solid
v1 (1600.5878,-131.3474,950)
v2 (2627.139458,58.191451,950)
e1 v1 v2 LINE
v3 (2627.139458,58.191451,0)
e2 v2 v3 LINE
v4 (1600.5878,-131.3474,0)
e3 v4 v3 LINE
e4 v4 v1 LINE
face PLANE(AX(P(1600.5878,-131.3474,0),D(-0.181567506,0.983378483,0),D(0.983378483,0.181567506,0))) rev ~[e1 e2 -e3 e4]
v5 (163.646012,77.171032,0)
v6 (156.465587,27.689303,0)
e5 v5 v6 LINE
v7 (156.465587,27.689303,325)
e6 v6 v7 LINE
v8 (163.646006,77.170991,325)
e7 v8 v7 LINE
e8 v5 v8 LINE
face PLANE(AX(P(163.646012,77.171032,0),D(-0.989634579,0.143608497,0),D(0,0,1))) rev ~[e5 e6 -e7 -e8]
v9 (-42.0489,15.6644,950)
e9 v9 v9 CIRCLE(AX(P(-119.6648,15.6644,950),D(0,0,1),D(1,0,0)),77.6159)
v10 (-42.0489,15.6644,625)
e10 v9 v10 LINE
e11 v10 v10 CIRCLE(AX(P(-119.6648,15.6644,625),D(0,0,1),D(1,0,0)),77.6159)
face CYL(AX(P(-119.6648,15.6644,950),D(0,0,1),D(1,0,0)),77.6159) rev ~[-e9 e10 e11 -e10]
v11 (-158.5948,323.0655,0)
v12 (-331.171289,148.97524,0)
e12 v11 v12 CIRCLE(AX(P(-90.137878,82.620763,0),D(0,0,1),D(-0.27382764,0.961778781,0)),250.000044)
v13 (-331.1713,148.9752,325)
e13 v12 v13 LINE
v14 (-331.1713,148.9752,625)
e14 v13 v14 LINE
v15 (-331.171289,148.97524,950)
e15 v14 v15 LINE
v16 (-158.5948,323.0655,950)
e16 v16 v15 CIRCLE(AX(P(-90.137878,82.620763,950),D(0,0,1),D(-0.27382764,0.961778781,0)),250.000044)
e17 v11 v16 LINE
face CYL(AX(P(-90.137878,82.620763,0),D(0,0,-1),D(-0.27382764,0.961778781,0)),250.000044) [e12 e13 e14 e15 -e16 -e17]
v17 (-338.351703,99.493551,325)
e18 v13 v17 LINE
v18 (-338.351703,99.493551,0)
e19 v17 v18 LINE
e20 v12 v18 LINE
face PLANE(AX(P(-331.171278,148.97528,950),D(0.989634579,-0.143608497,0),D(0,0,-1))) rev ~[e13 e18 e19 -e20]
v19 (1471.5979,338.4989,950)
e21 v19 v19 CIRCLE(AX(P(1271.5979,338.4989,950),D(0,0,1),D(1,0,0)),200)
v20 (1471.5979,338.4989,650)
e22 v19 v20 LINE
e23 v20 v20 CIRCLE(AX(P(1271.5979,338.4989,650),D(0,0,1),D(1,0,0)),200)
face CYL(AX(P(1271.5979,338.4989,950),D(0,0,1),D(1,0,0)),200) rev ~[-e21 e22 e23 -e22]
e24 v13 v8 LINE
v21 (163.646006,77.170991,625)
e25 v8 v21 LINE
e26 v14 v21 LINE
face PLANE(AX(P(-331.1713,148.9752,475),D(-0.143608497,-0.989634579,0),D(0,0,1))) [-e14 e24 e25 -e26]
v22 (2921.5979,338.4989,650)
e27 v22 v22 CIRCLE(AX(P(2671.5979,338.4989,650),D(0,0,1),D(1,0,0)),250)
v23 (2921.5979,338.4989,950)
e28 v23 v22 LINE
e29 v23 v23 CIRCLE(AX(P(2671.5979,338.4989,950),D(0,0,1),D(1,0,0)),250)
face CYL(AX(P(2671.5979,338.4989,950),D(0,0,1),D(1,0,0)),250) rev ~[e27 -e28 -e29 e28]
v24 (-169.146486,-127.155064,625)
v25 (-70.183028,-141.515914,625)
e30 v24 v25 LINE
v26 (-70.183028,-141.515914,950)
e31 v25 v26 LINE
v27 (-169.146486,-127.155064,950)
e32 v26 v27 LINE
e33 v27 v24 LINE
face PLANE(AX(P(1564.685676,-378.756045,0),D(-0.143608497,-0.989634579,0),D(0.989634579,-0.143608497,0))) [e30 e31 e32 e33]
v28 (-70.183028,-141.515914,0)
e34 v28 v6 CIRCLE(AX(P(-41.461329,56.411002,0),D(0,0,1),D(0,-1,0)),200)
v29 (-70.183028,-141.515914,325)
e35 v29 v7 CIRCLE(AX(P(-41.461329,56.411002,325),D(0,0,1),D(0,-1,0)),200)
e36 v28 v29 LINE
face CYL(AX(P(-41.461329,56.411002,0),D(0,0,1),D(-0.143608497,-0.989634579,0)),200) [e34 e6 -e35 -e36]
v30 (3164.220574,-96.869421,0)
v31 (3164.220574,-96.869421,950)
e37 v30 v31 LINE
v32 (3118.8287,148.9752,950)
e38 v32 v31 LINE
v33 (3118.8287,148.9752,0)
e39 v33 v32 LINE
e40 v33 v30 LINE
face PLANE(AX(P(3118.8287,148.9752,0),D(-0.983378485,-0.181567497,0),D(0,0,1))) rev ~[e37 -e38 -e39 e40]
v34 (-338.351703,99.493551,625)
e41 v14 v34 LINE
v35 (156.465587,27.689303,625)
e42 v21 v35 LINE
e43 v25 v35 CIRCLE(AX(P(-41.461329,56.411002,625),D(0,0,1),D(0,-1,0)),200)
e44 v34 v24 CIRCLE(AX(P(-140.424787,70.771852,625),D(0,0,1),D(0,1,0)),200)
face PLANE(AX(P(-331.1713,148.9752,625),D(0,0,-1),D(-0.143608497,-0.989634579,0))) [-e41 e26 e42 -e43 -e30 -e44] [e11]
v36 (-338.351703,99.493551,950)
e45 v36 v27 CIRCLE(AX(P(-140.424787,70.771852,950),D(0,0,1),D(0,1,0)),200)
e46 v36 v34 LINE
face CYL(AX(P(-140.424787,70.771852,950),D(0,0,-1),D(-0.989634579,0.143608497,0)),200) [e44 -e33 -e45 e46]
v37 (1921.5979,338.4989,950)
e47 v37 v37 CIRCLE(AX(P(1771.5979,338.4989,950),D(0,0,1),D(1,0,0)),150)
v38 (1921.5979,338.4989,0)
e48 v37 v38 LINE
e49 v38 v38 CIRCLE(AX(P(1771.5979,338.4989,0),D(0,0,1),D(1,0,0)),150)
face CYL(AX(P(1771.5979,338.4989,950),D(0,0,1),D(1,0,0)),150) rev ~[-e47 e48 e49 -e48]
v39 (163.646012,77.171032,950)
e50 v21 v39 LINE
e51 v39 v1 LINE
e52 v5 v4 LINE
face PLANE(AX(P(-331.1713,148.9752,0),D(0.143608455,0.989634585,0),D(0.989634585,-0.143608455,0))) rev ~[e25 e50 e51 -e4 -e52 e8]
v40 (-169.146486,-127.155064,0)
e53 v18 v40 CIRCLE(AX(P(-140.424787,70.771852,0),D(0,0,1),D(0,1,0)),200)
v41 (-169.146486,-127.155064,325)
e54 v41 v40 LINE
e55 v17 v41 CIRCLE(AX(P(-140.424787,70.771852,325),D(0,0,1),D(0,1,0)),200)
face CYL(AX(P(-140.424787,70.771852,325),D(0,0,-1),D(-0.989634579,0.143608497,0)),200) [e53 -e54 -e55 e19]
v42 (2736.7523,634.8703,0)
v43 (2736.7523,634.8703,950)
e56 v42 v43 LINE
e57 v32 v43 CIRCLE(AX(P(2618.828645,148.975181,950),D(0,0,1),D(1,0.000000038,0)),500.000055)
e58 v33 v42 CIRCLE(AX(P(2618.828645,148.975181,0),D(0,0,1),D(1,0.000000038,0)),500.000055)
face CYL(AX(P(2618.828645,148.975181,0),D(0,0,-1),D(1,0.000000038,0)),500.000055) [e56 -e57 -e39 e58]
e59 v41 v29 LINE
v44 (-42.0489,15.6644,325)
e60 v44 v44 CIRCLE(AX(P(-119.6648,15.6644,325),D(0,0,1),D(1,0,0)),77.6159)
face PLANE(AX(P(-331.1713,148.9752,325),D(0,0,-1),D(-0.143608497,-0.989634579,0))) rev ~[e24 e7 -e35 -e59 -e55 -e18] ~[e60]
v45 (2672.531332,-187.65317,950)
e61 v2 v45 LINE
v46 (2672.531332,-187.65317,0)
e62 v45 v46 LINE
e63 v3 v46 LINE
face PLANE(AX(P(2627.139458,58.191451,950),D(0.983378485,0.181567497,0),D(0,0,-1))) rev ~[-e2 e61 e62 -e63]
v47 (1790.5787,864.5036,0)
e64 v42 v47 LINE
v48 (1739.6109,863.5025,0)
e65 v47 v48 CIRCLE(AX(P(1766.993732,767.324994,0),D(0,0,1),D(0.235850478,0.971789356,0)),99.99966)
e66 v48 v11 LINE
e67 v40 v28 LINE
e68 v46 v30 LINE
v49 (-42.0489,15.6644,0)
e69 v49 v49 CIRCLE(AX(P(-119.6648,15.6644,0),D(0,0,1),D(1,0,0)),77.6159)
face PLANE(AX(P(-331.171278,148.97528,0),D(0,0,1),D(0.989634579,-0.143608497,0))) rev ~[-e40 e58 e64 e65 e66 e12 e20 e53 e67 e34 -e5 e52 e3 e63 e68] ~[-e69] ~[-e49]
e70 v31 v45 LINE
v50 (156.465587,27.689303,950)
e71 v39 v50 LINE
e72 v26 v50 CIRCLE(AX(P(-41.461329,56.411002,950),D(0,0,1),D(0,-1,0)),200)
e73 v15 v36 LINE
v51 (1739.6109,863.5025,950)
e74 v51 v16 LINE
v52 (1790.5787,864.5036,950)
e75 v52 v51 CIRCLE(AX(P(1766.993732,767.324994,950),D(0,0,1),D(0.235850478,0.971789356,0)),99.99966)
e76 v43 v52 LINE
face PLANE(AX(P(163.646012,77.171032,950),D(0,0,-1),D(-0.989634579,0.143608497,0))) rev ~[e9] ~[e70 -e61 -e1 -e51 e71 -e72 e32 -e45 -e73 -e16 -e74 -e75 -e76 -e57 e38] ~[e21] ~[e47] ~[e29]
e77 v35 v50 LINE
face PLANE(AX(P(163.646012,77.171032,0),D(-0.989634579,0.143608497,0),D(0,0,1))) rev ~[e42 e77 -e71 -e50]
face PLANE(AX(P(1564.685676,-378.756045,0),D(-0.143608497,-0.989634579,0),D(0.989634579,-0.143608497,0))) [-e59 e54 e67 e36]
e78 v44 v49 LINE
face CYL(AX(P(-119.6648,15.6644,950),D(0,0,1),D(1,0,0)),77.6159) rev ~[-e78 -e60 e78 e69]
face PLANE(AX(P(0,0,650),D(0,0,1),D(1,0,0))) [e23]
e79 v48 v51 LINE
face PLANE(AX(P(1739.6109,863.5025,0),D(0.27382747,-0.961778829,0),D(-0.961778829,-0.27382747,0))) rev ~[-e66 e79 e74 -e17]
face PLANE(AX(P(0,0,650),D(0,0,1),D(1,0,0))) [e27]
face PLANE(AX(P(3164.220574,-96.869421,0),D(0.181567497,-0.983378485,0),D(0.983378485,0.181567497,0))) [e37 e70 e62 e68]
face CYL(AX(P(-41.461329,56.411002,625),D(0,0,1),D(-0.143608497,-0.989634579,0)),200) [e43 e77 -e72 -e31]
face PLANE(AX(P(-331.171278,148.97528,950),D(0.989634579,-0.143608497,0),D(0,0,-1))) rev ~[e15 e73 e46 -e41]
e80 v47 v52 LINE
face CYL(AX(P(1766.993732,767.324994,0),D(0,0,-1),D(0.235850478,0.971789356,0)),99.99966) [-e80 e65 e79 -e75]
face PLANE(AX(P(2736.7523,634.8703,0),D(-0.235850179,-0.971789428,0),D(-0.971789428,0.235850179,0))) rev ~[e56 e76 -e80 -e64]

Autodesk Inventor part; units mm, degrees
ref_plane "YZ Plane" through (0, 0, 0) normal (1, 0, 0) x (0, 1, 0)
ref_plane "XZ Plane" through (0, 0, 0) normal (0, 1, 0) x (-1, 0, 0)
ref_plane "XY Plane" through (0, 0, 0) normal (0, 0, 1) x (1, 0, 0)
sketch "Skizze1" plane through (0, 0, 0) normal (0, 0, 1) x (1, 0, 0)
  arc A0 (3118.8287, 148.9752) -> (2736.7523, 634.8703) centre (2618.8287, 148.9752) ccw
  line L0 (2736.7523, 634.8703) -> (1790.5787, 864.5036)
  line L1 (1739.6109, 863.5025) -> (-158.5948, 323.0655)
  arc A1 (-158.5948, 323.0655) -> (-331.1713, 148.9752) centre (-90.1379, 82.6208) ccw
  arc A2 (1765.4752, 870.5961) -> (1764.4558, 870.5761) centre (1765.0035, 868.6526) ccw
  arc A3 (1790.5787, 864.5036) -> (1739.6109, 863.5025) centre (1766.9937, 767.3247) ccw
  line L2 (-331.1713, 148.9752) -> (1600.5878, -131.3474)
  line L3 (1600.5878, -131.3474) -> (3118.8287, 148.9752)
  point P0 (0, 0)
  point P1 (1764.9629, 870.7205)
  dimension "d1" = 1000
  dimension "d2" = 2000
  dimension "d3" = 500
  dimension "d4" = 250
extrude "Extrusion1" add sketch "Skizze1" along normal blind 950
sketch "Skizze2" plane through (3118.8287, 148.9752, 0) normal (0.1815675, -0.9833785, 0) x (0.9833785, 0.1815675, 0)
  line L0 (-1543.9029, 950) -> (0, 950) construction
  line L1 (-1543.9029, 0) -> (0, 0) construction
  line L2 (0, 950) -> (-500, 950)
  line L3 (-500, 950) -> (-500, 0)
  line L4 (-500, 0) -> (0, 0)
  line L5 (0, 0) -> (0, 950)
  line L6 (-3191.3386, 950) -> (-3392.6558, 950) projected
  line L7 (-1226.5582, 0) -> (-3191.3386, 0) construction
  line L8 (-3392.6558, 950) -> (-2892.6558, 950)
  line L9 (-2892.6558, 950) -> (-2892.6558, 0)
  line L10 (-2892.6558, 0) -> (-3392.6558, 0)
  line L11 (-3392.6558, 0) -> (-3392.6558, 950)
  point P0 (-3094.0381, 0)
  dimension "d16" = 500
  dimension "d17" = 500
extrude "Extrusion2" add sketch "Skizze2" along normal blind 250 contours L5 L4 L3 L2
sketch "Skizze3" plane through (1600.5878, -131.3474, 0) normal (-0.1436085, -0.9896346, 0) x (0.9896346, -0.1436085, 0)
  line L0 (-1951.9923, 0) -> (0, 0) construction
  line L1 (-1951.9923, 950) -> (0, 950) construction
  line L2 (-1951.9923, 0) -> (-1451.9923, 0)
  line L3 (-1451.9923, 0) -> (-1451.9923, 950)
  line L4 (-1451.9923, 950) -> (-1951.9923, 950)
  line L5 (-1951.9923, 950) -> (-1951.9923, 0)
  point P0 (-1602.8597, 0)
  dimension "d20" = 500
extrude "Extrusion3" add sketch "Skizze3" along normal blind 250
sketch "Skizze4" plane through (-331.1713, 148.9752, 0) normal (-0.9896346, 0.1436085, 0) x (0, 0, 1)
  line L0 (0, 0) -> (0, 197.0692) construction
  line L1 (950, 0) -> (950, -250) projected
  line L2 (0, 0) -> (950, 0)
  line L3 (950, 0) -> (950, -250)
  line L4 (950, -250) -> (0, -250)
  line L5 (0, -250) -> (0, 0)
  point P0 (0, -99.872)
sketch "Skizze5" plane through (0, 0, 950) normal (0, 0, 1) x (1, 0, 0)
  line L0 (163.646, 77.171) -> (1600.5878, -131.3474) construction
  line L1 (1600.5878, -131.3474) -> (2100.5878, -131.3474) construction
  circle A0 centre (1771.5979, 338.4989) radius 150
  point P0 (0, 0)
  dimension "d25" = 300
extrude "Extrusion4" cut sketch "Skizze5" against normal through all
sketch "Skizze6" plane through (0, 0, 950) normal (0, 0, 1) x (1, 0, 0)
  circle A0 centre (-119.6648, 15.6644) radius 77.6159
  point P0 (0, 0)
extrude "Extrusion5" cut sketch "Skizze6" against normal through all
sketch "Skizze7" plane through (-331.1713, 148.9752, 0) normal (-0.9896346, 0.1436085, 0) x (0, 0, 1)
  point P0 (0, -99.872)
sketch "Skizze8" plane through (-331.1713, 148.9752, 0) normal (-0.9896346, 0.1436085, 0) x (0, 0, 1)
  line L0 (950, 0) -> (0, 0) construction
  line L1 (0, -250) -> (950, -250) construction
  line L2 (475, 0) -> (625, 0)
  line L3 (625, 0) -> (625, -250)
  line L4 (625, -250) -> (475, -250)
  line L5 (475, -250) -> (475, 0)
  line L6 (475, 0) -> (325, 0)
  line L7 (325, 0) -> (325, -250)
  line L8 (325, -250) -> (475, -250)
  line L9 (475, -250) -> (475, 0)
  point P0 (0, -99.872)
  dimension "d31" = 150
  dimension "d32" = 150
extrude "Extrusion6" cut sketch "Skizze8" against normal through all
fillet "Rundung1" radius 200 4 edges at (-367.0734, -98.4335, 787.5) (-367.0734, -98.4335, 162.5) (127.7439, -170.2377, 162.5) (127.7439, -170.2377, 787.5)
sketch "Skizze9" plane through (0, 0, 950) normal (0, 0, 1) x (1, 0, 0)
  circle A0 centre (1271.5979, 338.4989) radius 200
  point P0 (0, 0)
  dimension "d37" = 400
extrude "Extrusion7" cut sketch "Skizze9" against normal blind 300
sketch "Skizze10" plane through (0, 0, 950) normal (0, 0, 1) x (1, 0, 0)
  circle A0 centre (2671.5979, 338.4989) radius 250
  point P0 (0, 0)
  dimension "d41" = 500
extrude "Extrusion8" cut sketch "Skizze10" against normal blind 300
